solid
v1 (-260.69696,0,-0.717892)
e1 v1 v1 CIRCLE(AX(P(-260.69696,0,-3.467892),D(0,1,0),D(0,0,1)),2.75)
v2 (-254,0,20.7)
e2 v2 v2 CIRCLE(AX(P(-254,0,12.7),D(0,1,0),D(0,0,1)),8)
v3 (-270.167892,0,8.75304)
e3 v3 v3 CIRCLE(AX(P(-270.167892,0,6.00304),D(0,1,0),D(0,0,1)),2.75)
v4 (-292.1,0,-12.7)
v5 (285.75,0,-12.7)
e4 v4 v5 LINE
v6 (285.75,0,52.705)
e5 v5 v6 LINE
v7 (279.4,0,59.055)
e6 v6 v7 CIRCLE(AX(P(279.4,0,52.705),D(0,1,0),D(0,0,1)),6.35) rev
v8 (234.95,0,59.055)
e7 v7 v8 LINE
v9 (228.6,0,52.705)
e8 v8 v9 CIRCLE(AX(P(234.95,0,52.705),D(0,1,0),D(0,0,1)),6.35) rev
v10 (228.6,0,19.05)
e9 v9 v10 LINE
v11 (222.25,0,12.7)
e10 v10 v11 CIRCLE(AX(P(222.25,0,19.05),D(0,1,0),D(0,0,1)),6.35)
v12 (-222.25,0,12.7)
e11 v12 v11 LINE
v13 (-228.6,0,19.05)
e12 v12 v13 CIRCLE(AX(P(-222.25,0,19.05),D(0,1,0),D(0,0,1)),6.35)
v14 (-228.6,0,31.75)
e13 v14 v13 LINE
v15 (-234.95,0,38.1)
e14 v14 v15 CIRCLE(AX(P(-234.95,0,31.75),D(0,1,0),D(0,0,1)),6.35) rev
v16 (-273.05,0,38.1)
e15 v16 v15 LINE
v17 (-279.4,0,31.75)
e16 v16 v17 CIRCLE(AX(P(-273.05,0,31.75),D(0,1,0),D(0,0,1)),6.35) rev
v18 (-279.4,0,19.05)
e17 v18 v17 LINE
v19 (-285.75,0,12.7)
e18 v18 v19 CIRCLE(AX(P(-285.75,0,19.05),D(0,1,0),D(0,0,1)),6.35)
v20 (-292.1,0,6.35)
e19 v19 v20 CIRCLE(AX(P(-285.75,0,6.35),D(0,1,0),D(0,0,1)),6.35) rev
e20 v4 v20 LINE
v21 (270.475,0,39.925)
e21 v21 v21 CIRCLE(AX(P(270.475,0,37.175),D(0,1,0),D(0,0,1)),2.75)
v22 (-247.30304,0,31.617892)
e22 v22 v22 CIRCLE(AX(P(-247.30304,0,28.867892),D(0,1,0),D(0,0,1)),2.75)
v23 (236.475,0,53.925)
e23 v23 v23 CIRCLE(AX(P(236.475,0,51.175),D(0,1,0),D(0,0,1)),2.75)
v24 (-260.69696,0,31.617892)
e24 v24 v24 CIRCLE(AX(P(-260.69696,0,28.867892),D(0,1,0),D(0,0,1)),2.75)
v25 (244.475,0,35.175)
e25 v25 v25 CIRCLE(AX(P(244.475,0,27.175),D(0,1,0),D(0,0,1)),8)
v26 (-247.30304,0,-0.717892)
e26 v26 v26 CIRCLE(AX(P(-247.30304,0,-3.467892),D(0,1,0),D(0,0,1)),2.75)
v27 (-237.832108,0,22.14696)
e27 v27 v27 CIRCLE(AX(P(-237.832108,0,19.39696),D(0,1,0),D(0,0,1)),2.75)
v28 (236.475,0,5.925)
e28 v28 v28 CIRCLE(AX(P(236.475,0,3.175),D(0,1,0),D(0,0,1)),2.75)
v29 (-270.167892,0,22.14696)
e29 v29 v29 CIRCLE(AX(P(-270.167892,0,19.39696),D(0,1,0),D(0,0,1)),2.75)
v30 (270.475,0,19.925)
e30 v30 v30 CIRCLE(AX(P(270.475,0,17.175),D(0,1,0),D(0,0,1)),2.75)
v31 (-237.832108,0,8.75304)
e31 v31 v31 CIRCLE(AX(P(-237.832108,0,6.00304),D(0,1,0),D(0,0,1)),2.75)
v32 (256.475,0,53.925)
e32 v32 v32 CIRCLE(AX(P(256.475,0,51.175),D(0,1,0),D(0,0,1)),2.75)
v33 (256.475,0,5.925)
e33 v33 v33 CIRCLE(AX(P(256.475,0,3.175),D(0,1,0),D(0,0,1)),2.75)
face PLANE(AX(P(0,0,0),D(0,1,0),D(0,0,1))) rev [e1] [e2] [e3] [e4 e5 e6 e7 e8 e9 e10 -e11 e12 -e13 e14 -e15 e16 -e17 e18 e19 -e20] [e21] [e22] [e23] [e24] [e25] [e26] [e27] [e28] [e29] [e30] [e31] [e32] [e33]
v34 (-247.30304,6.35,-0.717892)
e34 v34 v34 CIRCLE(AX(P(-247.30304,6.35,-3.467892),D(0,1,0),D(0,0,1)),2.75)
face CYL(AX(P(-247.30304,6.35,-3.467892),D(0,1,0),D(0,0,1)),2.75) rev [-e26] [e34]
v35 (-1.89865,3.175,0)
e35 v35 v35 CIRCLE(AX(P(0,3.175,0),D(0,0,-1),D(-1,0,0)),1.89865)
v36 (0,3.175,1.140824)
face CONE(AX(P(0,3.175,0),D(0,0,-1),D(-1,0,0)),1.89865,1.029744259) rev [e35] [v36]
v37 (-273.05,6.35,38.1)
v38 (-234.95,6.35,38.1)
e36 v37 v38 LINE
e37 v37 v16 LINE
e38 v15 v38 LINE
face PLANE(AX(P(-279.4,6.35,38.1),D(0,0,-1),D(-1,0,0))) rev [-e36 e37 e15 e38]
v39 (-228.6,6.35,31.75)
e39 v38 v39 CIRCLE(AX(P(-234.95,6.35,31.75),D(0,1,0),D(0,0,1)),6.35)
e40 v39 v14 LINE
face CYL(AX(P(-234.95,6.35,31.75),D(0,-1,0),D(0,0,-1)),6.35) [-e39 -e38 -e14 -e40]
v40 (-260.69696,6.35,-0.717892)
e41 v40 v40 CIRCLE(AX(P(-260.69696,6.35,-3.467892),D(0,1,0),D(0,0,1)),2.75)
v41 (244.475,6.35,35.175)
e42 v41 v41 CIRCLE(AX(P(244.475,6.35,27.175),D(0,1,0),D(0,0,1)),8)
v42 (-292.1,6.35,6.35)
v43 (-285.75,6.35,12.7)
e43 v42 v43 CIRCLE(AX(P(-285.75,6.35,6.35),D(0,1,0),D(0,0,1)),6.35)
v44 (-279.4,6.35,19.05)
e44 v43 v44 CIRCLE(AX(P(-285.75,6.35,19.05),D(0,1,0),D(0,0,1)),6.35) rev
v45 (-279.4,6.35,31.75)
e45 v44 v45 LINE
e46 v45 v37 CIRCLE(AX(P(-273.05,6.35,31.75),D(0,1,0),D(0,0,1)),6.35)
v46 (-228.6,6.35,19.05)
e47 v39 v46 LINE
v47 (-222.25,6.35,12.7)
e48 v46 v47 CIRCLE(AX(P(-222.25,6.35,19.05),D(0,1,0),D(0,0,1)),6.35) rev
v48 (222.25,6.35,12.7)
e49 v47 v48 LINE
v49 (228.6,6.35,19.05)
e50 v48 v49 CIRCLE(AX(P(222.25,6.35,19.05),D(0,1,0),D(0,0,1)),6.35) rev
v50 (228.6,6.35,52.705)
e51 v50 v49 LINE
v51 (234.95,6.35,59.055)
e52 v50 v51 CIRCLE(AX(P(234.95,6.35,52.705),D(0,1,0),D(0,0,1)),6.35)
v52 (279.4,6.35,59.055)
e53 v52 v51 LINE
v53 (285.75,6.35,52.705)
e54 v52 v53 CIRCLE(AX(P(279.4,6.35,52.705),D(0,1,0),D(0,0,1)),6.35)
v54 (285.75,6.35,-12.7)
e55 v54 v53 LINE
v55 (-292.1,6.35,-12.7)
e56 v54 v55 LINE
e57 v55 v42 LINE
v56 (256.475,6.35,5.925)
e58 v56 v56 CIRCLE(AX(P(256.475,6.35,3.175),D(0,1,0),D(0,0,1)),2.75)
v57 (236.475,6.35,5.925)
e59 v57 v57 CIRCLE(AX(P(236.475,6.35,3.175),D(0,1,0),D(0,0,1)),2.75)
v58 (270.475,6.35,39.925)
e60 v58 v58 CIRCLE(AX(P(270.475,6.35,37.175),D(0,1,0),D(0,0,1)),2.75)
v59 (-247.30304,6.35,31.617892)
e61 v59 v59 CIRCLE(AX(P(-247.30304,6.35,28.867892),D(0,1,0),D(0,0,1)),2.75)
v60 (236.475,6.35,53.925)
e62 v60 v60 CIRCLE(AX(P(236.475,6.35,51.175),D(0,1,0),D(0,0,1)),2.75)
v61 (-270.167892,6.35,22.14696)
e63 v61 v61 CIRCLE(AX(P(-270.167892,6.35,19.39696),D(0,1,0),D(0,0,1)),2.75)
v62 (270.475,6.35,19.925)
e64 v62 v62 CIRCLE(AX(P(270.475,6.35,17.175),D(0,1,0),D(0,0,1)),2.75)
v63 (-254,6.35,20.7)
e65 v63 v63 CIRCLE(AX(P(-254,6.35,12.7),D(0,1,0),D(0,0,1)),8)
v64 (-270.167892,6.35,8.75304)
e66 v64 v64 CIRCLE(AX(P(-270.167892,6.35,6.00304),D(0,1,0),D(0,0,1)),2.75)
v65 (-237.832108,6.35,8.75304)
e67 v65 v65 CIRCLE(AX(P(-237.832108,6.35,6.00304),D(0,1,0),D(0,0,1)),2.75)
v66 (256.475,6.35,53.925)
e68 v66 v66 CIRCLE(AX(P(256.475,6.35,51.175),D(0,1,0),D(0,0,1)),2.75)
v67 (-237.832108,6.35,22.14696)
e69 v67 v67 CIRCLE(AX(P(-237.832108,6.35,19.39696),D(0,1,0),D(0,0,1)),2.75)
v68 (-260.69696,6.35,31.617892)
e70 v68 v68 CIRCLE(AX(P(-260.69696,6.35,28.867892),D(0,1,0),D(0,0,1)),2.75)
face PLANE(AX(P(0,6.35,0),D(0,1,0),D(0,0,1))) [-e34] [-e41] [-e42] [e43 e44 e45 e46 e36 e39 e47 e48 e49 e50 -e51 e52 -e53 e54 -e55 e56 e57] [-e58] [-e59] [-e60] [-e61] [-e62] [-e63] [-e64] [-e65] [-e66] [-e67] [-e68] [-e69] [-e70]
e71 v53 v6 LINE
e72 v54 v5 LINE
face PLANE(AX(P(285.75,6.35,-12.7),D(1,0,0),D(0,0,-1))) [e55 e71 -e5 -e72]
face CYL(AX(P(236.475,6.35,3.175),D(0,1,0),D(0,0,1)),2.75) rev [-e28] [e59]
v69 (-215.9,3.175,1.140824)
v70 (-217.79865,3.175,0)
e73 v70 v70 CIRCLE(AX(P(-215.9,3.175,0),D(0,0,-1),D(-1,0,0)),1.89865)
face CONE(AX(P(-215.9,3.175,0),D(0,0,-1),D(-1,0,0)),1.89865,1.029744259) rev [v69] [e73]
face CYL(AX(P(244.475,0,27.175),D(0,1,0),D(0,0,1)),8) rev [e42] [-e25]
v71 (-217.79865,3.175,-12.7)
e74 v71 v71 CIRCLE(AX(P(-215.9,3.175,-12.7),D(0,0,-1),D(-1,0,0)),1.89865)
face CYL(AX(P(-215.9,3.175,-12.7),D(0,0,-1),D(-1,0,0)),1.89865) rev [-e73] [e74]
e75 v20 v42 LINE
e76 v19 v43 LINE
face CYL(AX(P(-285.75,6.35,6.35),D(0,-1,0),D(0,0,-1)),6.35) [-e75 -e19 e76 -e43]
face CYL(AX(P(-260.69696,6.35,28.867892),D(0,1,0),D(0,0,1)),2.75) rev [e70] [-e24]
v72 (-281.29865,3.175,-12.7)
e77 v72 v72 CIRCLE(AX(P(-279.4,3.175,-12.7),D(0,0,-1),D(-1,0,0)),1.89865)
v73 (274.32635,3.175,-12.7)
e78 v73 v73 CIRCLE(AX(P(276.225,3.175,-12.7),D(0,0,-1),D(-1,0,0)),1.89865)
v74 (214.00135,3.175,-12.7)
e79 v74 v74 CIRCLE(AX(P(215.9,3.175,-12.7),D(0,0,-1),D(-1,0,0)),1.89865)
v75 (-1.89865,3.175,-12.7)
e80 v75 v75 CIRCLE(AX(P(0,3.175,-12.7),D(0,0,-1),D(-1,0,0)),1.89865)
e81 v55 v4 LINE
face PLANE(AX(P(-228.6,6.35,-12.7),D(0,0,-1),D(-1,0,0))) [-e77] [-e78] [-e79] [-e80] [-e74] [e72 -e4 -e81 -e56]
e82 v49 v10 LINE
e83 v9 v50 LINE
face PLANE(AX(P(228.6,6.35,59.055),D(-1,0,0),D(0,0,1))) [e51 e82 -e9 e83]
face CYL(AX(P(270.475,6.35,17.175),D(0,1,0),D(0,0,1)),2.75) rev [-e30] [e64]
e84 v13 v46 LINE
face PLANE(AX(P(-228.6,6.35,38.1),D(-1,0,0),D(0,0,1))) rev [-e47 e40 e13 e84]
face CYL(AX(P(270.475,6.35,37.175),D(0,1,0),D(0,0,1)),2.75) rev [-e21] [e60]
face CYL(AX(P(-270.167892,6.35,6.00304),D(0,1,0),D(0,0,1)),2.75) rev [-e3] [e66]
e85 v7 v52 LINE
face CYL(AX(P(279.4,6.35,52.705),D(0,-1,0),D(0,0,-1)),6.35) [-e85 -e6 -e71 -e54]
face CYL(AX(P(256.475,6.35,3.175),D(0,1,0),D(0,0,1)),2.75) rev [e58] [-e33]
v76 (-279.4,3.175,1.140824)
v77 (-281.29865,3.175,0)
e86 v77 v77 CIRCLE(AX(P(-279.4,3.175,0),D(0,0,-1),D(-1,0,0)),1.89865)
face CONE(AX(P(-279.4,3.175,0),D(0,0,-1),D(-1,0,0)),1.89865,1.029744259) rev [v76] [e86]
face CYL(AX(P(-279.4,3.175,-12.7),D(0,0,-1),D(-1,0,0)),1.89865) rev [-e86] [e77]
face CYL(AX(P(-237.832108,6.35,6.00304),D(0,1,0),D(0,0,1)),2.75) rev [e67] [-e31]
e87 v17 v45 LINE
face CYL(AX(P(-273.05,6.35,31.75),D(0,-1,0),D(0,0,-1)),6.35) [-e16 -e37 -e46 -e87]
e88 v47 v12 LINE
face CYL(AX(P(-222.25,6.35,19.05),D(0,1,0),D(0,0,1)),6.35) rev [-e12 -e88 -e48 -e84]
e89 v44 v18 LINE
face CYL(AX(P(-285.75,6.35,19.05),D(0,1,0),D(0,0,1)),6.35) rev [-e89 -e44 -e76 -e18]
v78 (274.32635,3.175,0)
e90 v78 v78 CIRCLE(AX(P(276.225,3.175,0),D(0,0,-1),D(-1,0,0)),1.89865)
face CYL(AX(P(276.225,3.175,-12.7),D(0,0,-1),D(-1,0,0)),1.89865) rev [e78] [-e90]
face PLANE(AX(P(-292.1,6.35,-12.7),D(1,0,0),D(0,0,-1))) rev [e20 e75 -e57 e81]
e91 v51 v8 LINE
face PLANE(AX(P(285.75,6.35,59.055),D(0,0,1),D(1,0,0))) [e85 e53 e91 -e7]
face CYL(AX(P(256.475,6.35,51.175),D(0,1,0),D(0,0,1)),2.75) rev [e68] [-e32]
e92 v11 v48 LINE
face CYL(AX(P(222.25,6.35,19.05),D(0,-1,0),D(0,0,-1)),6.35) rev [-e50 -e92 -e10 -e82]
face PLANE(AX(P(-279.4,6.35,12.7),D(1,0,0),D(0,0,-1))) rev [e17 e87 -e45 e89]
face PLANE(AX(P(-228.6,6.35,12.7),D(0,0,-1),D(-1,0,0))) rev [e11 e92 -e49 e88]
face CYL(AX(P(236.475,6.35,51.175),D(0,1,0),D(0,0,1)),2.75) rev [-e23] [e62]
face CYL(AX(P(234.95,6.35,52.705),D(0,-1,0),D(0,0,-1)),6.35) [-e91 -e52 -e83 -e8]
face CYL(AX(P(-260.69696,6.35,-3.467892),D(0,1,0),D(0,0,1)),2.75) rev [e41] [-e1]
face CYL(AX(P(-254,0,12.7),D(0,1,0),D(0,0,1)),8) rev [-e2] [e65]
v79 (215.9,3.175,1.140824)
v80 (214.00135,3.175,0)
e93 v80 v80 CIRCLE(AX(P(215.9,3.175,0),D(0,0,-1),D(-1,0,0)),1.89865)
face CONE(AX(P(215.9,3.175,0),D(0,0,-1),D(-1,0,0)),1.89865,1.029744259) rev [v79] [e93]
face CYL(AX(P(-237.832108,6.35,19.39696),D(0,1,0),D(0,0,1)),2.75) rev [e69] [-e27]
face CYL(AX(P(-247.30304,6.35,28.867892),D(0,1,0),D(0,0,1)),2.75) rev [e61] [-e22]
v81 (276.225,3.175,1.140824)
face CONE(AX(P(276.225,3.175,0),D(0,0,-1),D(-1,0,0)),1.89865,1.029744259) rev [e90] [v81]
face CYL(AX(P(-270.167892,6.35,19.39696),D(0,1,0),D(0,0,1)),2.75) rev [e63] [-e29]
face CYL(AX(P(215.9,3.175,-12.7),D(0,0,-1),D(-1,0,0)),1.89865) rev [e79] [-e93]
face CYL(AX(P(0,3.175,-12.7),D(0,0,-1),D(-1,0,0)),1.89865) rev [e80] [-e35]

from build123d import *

# Parameters (mm, degrees)
BOSS_EXTRUDE1_DEPTH       = 6.35
M5_CLEARANCE_HOLE1_D      = 5.5
M5_CLEARANCE_HOLE1_DEPTH  = 12.7
M5_CLEARANCE_HOLE1_TIP    = 1.652366702
F_6_CLEARANCE_HOLE2_D     = 3.7973
F_6_CLEARANCE_HOLE2_DEPTH = 12.7
F_6_CLEARANCE_HOLE2_TIP   = 1.140824014
M5_CLEARANCE_HOLE2_D      = 5.5
M5_CLEARANCE_HOLE2_DEPTH  = 12.7
M5_CLEARANCE_HOLE2_TIP    = 1.652366702
FILLET1_R                 = 6.35
SKETCH8_R                 = 8
CUT_EXTRUDE1_DEPTH        = 6.35


with BuildPart() as part:
    # Sketch1 → Boss-Extrude1 (new body)
    with BuildSketch(Plane(origin=(0, 0, 0), x_dir=(1, 0, 0), z_dir=(0, 1, 0))):
        Polygon((-228.6, 12.7), (228.6, 12.7), (285.75, 12.7), (285.75, -59.055), (228.6, -59.055), (228.6, -12.7), (-228.6, -12.7), (-228.6, -38.1), (-279.4, -38.1), (-279.4, -12.7), (-292.1, -12.7), (-292.1, 12.7), (-279.4, 12.7), align=None)
    extrude(amount=BOSS_EXTRUDE1_DEPTH)

    # M5 Clearance Hole1
    with Locations(Plane(origin=(0, 6.35, 0), x_dir=(1, 0, 0), z_dir=(0, 1, 0))):
        with Locations((-270.167891819, -6.003039934), (-260.696960066, -28.867891819), (-237.832108181, -19.396960066), (-260.696960066, 3.467891819), (-247.303039934, 3.467891819), (-237.832108181, -6.003039934), (-270.167891819, -19.396960066), (-247.303039934, -28.867891819)):
            Hole(M5_CLEARANCE_HOLE1_D / 2, depth=M5_CLEARANCE_HOLE1_DEPTH)
            with Locations((0, 0, -(M5_CLEARANCE_HOLE1_DEPTH + M5_CLEARANCE_HOLE1_TIP / 2))):  # 118° drill point
                Cone(0, M5_CLEARANCE_HOLE1_D / 2, M5_CLEARANCE_HOLE1_TIP, mode=Mode.SUBTRACT)

    # #6 Clearance Hole2
    with Locations(Plane(origin=(0, 0, -12.7), x_dir=(-1, 0, 0), z_dir=(0, 0, -1))):
        with Locations((279.4, 3.175), (215.9, 3.175), (0, 3.175), (-215.9, 3.175), (-276.225, 3.175)):
            Hole(F_6_CLEARANCE_HOLE2_D / 2, depth=F_6_CLEARANCE_HOLE2_DEPTH)
            with Locations((0, 0, -(F_6_CLEARANCE_HOLE2_DEPTH + F_6_CLEARANCE_HOLE2_TIP / 2))):  # 118° drill point
                Cone(0, F_6_CLEARANCE_HOLE2_D / 2, F_6_CLEARANCE_HOLE2_TIP, mode=Mode.SUBTRACT)

    # M5 Clearance Hole2
    with Locations(Plane(origin=(0, 6.35, 0), x_dir=(1, 0, 0), z_dir=(0, 1, 0))):
        with Locations((218.475, -17.174999994), (218.475, -37.174999994), (244.475, -27.174999994), (256.475, -3.175), (256.475, -51.175), (236.475, -3.175), (236.475, -51.175), (270.475, -17.174999994), (270.475, -37.174999994)):
            Hole(M5_CLEARANCE_HOLE2_D / 2, depth=M5_CLEARANCE_HOLE2_DEPTH)
            with Locations((0, 0, -(M5_CLEARANCE_HOLE2_DEPTH + M5_CLEARANCE_HOLE2_TIP / 2))):  # 118° drill point
                Cone(0, M5_CLEARANCE_HOLE2_D / 2, M5_CLEARANCE_HOLE2_TIP, mode=Mode.SUBTRACT)

    # Fillet1
    fillet1_edges = [part.edges().sort_by_distance(p)[0] for p in [
        (285.75, 3.175, 59.055),
        (228.6, 3.175, 59.055),
        (228.6, 3.175, 12.7),
        (-228.6, 3.175, 12.7),
        (-228.6, 3.175, 38.1),
        (-279.4, 3.175, 38.1),
        (-279.4, 3.175, 12.7),
        (-292.1, 3.175, 12.7),
    ]]
    fillet(fillet1_edges, radius=FILLET1_R - 0.0001)  # a hair under: the kernel refuses the full size

    # Sketch8 → Cut-Extrude1 (cut)
    with BuildSketch(Plane(origin=(0, 6.35, 0), x_dir=(1, 0, 0), z_dir=(0, 1, 0))):
        with Locations(Location((-254, -12.7, 0), (0, 0, 270))):
            Circle(SKETCH8_R)
        with Locations(Location((244.475, -27.174999994, 0), (0, 0, 270))):
            Circle(SKETCH8_R)
    extrude(amount=-CUT_EXTRUDE1_DEPTH, mode=Mode.SUBTRACT)


solid = part.part
